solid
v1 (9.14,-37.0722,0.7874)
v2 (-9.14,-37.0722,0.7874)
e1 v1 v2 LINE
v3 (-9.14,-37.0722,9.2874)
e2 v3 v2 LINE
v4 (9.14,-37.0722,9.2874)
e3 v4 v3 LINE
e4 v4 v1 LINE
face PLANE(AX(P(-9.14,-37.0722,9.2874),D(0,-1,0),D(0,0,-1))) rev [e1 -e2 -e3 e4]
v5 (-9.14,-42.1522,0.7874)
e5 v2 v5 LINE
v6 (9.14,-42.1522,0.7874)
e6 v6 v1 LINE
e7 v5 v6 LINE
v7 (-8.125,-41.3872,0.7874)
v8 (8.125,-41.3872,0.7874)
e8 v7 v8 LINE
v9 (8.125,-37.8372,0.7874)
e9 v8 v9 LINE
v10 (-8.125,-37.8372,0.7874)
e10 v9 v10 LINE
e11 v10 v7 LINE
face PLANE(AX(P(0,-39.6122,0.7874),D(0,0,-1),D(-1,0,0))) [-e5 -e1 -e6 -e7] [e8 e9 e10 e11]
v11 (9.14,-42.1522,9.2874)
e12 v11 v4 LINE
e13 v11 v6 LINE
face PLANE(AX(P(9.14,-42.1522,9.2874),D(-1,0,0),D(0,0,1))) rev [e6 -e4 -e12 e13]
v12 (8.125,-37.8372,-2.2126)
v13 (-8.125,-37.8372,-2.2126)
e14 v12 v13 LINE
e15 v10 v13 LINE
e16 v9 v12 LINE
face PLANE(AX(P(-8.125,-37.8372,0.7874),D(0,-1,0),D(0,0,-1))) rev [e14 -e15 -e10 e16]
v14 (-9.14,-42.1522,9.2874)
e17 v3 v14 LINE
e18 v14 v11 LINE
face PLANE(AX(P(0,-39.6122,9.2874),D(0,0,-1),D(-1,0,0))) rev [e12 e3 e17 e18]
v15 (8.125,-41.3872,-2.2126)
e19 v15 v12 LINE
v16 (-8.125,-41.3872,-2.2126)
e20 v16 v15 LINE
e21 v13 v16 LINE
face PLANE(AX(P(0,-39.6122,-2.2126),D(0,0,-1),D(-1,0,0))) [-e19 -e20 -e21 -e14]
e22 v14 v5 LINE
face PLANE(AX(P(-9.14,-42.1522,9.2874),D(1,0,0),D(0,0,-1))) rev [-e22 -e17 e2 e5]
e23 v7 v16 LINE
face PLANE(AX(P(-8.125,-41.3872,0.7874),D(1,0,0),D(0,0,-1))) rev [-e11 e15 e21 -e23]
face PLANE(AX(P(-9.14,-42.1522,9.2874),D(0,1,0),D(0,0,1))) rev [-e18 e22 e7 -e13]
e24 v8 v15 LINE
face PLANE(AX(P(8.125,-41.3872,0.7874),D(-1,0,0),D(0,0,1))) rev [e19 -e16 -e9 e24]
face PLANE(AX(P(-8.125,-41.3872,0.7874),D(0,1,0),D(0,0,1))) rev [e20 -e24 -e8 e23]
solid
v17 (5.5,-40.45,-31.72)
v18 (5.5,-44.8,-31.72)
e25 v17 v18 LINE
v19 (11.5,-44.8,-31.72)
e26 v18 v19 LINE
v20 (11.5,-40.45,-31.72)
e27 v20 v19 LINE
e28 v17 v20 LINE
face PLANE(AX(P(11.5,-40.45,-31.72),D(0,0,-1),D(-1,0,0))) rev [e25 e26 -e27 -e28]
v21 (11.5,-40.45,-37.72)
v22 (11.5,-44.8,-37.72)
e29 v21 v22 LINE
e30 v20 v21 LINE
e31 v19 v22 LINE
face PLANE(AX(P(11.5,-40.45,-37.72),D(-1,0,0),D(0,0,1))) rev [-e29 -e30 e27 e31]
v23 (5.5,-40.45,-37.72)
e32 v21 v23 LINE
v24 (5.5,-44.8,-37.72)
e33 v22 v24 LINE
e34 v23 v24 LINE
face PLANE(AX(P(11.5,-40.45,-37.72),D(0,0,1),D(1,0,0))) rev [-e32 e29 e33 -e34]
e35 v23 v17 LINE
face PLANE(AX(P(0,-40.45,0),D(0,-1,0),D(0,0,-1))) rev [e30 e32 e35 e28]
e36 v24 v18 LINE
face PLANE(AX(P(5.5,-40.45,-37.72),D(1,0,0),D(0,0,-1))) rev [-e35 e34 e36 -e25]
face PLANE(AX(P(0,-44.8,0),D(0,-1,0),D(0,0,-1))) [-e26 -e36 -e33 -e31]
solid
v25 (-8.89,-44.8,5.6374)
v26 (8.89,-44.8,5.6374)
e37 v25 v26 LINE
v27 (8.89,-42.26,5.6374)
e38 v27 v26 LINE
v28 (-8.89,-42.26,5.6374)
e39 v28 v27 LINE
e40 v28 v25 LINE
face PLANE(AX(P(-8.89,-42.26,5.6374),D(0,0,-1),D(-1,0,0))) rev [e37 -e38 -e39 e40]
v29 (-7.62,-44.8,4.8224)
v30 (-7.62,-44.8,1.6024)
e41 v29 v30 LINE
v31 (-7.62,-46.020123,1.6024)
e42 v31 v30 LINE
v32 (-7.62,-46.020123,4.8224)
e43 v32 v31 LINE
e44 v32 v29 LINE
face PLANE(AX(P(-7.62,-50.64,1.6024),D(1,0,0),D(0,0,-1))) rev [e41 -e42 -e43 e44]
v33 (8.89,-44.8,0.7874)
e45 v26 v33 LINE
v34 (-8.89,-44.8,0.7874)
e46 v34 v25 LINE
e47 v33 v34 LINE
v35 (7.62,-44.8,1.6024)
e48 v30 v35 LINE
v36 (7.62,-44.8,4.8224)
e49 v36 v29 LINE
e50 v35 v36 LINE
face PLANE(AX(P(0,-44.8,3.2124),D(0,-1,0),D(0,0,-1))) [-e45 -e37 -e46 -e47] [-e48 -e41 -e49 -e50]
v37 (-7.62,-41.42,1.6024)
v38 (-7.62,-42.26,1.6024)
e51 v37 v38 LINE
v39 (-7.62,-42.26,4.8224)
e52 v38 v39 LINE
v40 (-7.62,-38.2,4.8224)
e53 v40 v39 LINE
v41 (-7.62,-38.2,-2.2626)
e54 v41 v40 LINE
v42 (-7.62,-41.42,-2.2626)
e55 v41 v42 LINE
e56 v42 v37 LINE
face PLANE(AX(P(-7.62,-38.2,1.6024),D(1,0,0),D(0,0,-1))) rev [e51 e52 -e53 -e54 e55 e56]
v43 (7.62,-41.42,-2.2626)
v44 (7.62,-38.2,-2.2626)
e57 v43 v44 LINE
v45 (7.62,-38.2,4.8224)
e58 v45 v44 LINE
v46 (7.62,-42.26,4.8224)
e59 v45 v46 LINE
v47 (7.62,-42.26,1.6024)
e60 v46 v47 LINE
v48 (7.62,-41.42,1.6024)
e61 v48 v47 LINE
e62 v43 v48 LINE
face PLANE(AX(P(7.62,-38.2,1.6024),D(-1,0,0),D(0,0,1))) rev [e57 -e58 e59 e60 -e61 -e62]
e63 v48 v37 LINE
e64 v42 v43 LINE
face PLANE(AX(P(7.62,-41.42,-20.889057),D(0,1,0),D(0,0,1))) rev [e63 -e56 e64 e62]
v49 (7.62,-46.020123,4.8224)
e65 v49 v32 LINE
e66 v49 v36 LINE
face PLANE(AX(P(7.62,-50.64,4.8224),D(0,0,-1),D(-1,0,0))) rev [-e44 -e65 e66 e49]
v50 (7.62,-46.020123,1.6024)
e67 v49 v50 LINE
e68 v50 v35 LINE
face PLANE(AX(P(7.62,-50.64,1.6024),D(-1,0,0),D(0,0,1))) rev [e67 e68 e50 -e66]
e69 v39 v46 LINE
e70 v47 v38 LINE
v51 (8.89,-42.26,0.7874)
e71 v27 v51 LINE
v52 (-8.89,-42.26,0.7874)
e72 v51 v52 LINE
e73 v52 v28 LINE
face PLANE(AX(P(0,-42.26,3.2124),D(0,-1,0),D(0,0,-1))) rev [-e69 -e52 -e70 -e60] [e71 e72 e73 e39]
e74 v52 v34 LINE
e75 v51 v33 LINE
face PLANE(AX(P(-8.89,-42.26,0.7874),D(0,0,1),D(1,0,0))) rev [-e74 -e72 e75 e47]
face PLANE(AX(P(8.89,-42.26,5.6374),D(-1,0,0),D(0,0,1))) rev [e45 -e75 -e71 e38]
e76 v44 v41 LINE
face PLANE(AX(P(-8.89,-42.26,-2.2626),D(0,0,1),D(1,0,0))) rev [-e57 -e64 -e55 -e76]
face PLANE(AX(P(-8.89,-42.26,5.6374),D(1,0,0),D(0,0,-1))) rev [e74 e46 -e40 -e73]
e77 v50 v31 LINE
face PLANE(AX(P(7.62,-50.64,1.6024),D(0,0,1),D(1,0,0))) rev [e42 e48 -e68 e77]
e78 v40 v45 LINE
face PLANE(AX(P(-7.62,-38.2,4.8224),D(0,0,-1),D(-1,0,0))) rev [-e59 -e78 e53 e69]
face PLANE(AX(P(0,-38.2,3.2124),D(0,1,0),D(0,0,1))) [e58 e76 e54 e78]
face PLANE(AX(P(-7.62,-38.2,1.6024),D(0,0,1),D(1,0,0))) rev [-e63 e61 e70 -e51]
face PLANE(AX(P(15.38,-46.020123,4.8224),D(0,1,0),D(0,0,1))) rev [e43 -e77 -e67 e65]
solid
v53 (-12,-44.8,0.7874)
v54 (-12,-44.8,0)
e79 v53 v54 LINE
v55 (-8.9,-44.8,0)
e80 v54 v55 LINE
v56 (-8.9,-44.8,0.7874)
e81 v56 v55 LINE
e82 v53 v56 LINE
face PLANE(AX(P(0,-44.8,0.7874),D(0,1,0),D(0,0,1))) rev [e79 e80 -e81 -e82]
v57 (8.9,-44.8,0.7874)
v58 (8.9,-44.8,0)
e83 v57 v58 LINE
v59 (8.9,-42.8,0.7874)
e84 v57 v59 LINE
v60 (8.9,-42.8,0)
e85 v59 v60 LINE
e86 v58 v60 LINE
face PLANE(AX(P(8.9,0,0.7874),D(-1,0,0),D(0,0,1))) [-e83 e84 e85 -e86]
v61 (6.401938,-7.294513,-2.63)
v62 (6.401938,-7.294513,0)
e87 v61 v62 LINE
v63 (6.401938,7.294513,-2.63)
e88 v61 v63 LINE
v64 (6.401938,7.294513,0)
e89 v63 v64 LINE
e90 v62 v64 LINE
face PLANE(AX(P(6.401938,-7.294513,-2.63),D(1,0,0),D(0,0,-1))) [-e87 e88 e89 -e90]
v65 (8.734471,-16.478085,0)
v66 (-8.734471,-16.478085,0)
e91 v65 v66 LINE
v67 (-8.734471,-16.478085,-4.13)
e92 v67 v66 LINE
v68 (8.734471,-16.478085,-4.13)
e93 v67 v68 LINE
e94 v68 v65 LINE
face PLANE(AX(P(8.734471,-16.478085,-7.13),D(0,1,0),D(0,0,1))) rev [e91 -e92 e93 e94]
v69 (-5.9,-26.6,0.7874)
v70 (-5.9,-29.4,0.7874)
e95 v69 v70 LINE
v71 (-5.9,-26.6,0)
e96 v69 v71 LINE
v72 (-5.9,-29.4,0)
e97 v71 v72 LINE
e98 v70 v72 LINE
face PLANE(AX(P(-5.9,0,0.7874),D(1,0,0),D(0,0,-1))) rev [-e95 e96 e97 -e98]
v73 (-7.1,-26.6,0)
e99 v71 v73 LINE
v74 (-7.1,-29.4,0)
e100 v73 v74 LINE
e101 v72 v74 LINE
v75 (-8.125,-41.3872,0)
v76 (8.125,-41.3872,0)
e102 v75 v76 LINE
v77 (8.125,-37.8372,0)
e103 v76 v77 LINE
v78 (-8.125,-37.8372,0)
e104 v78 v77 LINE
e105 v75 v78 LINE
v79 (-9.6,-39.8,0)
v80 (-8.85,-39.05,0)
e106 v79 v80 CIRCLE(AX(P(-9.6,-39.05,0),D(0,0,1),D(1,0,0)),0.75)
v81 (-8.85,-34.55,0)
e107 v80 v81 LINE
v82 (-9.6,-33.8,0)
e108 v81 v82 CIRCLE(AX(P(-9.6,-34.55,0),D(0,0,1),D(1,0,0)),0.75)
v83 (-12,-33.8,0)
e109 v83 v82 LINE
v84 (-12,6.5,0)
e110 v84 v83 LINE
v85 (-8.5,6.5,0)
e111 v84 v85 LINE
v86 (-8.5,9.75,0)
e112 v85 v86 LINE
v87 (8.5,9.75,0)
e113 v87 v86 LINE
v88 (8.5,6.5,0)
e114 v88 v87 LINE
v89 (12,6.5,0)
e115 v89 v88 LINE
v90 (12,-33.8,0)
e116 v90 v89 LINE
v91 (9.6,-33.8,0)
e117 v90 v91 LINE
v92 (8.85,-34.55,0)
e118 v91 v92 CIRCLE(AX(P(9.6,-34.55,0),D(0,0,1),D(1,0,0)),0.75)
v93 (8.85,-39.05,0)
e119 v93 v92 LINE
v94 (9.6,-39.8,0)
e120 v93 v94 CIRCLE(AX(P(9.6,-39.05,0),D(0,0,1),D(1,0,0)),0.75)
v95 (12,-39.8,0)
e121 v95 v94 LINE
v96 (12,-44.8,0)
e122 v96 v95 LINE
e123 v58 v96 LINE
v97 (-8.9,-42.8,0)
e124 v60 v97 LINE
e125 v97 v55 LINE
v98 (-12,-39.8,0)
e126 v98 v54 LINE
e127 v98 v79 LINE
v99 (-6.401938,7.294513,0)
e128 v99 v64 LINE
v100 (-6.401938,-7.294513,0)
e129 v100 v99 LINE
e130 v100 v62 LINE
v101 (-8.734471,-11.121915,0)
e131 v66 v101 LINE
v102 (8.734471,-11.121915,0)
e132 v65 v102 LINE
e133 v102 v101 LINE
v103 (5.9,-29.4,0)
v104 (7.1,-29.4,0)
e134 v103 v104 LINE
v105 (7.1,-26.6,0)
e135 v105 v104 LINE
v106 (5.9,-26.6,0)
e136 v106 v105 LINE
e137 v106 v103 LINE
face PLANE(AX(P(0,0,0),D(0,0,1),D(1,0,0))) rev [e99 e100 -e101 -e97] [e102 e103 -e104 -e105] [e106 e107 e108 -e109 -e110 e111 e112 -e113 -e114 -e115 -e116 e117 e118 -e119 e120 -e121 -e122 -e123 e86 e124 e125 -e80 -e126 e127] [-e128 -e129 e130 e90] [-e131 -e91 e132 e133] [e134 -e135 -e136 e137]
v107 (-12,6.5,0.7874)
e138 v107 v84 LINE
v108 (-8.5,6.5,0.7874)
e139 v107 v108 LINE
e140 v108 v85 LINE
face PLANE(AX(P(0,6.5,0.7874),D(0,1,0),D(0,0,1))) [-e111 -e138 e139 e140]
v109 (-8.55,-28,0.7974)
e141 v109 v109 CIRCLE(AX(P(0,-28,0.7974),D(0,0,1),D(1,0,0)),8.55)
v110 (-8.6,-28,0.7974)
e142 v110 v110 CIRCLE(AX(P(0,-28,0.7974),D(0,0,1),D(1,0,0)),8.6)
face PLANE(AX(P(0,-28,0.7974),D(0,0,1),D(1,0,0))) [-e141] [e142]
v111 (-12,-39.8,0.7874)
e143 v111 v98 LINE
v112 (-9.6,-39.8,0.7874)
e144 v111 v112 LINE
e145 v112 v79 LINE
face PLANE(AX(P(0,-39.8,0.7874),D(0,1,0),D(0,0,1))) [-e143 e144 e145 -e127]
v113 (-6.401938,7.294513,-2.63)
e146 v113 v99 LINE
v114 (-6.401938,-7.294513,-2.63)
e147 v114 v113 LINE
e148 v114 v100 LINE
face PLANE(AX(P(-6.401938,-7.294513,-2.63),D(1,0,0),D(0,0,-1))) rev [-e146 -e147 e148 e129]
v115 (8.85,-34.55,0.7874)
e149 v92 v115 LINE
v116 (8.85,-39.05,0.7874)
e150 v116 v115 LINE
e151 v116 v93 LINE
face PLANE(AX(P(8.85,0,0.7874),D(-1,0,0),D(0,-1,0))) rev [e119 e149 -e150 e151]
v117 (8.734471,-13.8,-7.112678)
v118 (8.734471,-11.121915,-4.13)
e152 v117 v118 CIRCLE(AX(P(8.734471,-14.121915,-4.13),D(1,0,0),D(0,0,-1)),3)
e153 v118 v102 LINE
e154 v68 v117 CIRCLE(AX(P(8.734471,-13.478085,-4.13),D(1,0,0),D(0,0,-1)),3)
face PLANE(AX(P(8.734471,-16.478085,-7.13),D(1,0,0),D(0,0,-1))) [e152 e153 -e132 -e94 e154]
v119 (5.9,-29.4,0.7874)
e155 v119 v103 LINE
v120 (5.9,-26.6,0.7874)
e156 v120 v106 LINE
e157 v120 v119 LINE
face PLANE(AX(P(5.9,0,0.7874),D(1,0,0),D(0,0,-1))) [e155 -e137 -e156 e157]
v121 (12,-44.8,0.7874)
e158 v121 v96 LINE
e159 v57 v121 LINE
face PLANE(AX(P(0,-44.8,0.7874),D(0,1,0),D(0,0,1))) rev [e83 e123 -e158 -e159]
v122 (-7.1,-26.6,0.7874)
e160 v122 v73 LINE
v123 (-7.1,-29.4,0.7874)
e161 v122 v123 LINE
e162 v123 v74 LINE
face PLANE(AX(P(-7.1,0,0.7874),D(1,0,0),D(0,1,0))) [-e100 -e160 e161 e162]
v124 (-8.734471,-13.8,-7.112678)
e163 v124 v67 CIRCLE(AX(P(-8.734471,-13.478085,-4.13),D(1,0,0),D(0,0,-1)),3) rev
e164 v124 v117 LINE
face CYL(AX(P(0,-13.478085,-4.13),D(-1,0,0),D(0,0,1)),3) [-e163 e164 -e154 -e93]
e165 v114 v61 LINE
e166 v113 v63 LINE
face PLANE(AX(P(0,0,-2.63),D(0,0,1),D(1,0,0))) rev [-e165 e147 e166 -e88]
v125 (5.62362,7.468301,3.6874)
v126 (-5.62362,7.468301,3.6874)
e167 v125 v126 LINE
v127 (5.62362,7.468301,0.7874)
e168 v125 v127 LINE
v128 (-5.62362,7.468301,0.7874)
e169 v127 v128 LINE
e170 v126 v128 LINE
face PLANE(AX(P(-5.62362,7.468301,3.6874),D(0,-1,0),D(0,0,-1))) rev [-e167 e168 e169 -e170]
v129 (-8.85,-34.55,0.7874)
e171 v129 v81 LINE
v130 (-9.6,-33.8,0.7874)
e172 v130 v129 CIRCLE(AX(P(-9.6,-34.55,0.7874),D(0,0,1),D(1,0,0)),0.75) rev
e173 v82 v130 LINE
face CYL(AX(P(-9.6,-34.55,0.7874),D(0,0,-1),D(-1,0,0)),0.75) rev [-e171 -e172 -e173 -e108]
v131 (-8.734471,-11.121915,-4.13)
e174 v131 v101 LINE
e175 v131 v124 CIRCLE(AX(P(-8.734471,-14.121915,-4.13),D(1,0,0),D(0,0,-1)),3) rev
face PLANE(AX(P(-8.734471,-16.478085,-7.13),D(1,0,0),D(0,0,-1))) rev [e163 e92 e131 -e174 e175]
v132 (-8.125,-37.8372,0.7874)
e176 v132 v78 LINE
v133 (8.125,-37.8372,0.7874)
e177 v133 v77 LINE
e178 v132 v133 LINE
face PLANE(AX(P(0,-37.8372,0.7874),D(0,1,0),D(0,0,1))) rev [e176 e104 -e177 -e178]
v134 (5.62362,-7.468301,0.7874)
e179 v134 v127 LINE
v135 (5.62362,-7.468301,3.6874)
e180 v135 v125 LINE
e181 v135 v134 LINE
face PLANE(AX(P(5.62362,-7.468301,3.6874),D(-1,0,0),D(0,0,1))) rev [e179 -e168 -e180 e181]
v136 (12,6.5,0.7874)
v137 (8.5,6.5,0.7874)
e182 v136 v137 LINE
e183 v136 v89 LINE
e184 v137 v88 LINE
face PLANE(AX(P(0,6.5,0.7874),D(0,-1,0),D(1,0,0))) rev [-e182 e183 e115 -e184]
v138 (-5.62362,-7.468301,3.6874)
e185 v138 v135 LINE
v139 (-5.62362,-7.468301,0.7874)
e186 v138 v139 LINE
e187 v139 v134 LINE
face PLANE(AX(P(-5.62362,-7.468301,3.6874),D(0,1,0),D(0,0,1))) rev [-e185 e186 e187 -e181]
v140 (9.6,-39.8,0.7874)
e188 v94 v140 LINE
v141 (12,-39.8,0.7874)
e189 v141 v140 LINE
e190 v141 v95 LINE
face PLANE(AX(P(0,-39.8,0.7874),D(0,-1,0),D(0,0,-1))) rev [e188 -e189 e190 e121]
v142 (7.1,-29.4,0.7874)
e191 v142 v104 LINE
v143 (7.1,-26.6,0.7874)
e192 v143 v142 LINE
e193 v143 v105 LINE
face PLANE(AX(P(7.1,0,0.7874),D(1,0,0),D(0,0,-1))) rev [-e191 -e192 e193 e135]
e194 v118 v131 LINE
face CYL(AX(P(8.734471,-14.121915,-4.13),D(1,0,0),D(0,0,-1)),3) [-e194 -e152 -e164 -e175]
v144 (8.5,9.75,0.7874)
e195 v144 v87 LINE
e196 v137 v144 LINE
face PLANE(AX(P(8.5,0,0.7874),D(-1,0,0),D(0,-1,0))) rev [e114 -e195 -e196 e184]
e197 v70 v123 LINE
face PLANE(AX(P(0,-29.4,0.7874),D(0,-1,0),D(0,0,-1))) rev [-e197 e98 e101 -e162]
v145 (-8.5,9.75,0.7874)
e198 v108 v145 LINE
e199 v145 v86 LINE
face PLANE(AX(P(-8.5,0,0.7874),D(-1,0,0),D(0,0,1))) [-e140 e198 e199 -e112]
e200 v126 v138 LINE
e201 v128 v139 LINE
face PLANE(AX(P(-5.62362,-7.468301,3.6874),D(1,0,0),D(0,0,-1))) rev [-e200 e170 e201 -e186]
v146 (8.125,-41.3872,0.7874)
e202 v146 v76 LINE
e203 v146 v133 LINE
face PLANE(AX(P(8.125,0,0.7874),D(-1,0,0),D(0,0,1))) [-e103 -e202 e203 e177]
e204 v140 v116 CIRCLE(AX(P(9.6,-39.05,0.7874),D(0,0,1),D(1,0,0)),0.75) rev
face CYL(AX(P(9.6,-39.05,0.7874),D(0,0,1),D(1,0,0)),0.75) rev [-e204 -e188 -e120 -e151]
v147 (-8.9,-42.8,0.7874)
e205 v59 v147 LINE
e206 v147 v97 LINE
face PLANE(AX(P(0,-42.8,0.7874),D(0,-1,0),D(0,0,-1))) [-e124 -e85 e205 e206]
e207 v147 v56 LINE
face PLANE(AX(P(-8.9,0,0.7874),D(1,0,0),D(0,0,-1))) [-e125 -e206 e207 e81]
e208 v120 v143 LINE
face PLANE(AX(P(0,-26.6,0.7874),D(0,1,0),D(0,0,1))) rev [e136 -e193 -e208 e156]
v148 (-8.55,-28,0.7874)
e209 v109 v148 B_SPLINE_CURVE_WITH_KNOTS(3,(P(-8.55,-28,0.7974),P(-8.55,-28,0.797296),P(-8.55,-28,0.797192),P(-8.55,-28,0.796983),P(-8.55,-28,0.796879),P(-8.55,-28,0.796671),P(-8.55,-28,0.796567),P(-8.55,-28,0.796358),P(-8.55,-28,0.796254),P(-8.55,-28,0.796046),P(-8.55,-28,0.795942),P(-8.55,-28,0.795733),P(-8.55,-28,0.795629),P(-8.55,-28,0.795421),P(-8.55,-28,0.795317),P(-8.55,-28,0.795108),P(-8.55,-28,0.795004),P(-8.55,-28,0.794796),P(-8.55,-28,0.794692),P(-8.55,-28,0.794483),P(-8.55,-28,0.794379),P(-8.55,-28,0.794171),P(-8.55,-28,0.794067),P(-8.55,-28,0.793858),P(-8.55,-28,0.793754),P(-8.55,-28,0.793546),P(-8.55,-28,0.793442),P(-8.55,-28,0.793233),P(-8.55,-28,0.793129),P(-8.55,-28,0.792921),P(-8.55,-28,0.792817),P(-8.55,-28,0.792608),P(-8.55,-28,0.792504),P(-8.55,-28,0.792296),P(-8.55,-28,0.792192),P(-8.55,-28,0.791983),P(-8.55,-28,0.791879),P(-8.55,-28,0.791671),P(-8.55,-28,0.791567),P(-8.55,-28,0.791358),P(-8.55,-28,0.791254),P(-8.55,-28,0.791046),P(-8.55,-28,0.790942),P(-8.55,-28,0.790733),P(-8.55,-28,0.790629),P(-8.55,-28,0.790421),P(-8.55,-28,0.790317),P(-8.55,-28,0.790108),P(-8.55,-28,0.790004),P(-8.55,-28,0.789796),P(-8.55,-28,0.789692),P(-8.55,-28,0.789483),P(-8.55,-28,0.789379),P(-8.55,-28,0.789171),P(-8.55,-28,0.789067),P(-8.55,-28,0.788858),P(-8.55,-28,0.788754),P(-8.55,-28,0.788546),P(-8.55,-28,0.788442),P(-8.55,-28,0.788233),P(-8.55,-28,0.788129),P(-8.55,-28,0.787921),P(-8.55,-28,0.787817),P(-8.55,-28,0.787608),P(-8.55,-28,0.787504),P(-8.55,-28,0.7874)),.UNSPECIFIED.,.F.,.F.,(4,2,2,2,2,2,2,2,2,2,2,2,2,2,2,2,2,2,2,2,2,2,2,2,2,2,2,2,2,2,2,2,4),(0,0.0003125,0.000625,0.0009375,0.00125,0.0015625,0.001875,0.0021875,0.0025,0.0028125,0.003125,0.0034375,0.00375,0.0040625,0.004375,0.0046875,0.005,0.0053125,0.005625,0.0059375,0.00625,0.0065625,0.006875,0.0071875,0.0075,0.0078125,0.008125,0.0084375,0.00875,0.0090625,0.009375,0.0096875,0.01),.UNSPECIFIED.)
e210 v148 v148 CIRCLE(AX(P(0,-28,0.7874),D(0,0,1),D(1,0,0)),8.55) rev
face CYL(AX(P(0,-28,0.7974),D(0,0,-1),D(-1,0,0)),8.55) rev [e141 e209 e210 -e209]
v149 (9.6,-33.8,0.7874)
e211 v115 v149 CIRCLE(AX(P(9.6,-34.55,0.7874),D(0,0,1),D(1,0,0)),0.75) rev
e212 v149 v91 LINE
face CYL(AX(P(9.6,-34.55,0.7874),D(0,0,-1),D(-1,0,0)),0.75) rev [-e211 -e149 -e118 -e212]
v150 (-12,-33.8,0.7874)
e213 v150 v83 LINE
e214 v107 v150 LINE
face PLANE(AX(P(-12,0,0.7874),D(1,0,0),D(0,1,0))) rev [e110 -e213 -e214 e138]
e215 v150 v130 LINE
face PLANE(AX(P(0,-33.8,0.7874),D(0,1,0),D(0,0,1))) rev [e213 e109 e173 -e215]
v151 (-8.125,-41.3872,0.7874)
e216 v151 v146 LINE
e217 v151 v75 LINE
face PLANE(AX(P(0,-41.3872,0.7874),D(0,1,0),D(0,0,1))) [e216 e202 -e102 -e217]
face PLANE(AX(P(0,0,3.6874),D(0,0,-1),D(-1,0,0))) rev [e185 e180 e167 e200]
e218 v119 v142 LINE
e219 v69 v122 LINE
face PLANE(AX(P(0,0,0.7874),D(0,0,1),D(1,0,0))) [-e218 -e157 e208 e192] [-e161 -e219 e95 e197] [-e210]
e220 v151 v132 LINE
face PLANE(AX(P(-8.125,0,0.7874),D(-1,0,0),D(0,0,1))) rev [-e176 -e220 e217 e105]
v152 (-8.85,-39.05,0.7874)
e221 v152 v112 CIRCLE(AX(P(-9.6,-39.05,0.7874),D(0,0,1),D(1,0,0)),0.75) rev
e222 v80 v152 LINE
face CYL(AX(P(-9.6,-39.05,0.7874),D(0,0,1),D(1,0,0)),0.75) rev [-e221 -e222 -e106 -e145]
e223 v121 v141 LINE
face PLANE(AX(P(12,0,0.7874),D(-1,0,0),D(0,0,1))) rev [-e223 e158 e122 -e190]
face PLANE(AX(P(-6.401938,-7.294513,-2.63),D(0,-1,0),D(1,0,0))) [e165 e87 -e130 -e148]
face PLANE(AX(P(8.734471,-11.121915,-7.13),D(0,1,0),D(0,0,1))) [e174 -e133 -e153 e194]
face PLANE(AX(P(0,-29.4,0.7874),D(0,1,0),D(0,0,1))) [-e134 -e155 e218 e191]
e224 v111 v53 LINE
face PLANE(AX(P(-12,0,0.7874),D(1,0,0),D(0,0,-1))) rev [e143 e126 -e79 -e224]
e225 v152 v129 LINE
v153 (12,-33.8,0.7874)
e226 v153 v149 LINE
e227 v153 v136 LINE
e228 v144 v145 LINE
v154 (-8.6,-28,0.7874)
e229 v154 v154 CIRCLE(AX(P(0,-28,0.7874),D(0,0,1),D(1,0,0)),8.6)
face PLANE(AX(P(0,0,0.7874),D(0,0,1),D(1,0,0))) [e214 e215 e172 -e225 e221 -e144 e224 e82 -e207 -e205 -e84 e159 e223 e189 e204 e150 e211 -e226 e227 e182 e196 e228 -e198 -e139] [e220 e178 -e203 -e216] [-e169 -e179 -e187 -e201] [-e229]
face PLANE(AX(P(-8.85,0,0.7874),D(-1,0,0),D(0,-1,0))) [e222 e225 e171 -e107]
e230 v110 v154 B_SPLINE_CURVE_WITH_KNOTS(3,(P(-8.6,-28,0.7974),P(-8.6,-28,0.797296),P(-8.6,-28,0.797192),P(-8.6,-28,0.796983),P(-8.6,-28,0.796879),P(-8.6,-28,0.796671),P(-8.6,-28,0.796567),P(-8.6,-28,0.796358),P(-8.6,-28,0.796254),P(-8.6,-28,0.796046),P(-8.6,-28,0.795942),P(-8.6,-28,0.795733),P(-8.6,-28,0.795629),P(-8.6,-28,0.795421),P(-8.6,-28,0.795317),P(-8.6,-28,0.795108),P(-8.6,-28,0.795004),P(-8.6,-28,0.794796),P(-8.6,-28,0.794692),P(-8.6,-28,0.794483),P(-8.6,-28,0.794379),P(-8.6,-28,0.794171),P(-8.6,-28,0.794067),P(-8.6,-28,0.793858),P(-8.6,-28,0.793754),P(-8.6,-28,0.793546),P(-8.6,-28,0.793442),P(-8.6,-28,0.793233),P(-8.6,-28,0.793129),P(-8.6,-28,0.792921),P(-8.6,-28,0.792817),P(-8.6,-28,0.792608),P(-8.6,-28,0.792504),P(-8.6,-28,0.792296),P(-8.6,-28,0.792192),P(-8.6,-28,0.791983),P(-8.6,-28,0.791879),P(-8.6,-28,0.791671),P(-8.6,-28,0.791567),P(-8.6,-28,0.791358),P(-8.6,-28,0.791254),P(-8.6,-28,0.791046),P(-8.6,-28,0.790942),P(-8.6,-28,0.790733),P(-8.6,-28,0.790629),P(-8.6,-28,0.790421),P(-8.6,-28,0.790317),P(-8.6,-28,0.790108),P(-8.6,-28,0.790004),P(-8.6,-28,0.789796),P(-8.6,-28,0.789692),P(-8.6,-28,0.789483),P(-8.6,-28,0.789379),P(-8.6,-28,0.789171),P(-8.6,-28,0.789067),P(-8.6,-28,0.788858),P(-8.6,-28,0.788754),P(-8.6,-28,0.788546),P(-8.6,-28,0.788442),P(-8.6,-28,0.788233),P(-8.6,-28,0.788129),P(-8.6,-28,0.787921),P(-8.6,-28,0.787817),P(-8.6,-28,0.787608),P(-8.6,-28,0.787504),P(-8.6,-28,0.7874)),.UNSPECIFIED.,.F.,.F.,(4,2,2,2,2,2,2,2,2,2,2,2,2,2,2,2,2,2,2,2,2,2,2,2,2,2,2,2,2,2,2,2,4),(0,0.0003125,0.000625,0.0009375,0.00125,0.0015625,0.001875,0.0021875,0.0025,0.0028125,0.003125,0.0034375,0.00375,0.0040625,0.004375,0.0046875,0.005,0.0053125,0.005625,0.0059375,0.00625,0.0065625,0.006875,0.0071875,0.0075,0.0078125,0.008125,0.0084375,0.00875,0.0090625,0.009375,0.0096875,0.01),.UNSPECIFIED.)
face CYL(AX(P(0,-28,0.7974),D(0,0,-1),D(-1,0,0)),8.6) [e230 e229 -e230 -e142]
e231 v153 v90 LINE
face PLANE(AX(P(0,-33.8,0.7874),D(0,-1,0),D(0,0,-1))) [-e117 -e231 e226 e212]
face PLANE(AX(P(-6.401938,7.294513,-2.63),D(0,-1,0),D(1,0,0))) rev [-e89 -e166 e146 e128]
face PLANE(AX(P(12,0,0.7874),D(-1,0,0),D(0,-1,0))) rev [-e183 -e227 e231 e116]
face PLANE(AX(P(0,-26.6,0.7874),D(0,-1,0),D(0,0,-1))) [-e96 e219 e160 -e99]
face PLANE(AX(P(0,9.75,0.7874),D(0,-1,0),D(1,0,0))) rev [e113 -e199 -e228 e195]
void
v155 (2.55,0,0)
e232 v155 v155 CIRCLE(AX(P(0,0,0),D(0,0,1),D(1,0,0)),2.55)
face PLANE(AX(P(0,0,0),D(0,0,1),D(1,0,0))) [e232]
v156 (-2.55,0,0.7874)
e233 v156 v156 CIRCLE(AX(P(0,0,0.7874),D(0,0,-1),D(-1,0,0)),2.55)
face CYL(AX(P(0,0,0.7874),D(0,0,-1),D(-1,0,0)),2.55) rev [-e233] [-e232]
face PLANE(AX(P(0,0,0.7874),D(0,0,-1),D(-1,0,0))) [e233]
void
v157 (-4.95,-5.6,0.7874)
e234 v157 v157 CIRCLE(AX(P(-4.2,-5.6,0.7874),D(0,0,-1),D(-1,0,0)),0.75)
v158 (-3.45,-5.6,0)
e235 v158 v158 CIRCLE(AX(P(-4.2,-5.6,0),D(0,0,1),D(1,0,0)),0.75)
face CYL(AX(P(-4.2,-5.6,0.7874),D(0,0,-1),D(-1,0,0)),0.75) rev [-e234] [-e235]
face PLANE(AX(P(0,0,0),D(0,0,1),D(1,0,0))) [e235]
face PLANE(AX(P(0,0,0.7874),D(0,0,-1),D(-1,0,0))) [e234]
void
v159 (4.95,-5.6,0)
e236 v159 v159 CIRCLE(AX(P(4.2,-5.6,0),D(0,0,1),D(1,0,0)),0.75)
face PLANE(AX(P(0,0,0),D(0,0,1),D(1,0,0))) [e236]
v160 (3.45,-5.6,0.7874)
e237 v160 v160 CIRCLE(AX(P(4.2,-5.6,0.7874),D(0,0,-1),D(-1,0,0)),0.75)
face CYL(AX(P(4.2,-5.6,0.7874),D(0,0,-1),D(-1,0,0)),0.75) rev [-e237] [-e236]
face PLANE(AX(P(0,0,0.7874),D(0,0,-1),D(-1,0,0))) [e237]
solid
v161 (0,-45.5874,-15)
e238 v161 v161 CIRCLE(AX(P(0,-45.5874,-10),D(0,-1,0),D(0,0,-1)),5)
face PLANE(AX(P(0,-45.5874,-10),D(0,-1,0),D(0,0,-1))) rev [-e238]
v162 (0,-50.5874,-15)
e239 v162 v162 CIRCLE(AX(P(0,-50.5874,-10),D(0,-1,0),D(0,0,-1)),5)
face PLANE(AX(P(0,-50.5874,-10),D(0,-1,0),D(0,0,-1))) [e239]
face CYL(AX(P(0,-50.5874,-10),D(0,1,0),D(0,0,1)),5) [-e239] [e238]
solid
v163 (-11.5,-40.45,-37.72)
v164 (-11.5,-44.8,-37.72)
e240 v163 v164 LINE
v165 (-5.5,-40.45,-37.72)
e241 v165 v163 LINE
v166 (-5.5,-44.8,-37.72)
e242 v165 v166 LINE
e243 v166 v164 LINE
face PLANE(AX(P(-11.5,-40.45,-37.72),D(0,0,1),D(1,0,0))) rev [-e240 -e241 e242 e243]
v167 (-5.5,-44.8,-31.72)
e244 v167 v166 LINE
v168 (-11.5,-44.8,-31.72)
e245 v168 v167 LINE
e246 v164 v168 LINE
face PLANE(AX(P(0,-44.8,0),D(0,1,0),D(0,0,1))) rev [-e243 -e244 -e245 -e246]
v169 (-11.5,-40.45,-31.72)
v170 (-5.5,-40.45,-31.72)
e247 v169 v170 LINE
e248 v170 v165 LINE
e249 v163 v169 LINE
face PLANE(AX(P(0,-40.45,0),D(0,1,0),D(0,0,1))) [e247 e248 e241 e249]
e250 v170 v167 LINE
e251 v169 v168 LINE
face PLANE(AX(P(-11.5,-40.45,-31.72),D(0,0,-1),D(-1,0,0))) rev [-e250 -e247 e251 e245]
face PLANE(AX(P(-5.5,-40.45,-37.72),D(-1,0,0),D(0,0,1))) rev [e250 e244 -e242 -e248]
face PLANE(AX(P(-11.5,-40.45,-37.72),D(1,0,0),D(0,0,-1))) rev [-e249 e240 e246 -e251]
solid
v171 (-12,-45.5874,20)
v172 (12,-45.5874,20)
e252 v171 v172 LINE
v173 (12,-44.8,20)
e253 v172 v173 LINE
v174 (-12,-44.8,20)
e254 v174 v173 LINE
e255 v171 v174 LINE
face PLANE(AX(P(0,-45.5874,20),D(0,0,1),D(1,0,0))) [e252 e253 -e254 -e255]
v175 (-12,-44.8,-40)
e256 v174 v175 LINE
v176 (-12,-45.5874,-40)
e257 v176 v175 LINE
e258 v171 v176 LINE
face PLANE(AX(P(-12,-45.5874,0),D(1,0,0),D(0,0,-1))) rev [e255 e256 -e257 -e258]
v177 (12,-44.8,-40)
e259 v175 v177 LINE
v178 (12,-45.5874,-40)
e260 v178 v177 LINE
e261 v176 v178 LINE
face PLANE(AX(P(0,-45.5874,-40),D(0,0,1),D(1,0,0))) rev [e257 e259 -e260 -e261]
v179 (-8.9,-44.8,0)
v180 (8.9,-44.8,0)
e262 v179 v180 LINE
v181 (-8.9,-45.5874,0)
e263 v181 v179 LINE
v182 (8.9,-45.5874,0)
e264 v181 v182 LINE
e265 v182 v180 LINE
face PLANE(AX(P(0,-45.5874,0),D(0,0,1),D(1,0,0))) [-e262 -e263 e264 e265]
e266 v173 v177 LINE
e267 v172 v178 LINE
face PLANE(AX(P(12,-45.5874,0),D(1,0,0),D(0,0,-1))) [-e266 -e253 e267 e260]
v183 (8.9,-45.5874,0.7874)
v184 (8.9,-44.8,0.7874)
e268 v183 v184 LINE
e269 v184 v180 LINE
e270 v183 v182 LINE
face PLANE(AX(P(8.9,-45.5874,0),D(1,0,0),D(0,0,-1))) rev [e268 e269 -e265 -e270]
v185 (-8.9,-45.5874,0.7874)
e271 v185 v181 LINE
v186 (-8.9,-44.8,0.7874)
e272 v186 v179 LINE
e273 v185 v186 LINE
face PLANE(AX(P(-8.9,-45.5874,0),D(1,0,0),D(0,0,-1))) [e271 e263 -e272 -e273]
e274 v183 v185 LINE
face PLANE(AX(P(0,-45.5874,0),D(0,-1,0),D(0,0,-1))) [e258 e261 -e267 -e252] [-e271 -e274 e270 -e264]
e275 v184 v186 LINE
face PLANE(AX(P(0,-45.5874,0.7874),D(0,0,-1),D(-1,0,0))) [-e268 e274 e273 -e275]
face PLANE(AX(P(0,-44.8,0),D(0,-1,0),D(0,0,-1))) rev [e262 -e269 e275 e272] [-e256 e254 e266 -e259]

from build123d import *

# Parameters (mm, degrees)
SKETCH1_R                         = 2.55
SKETCH1_R_2                       = 0.75
SKETCH1_W                         = 1.2
SKETCH1_H                         = 2.8
SKETCH1_W_2                       = 16.25
SKETCH1_H_2                       = 3.55
BOSS_EXTRUDE3_DEPTH               = 0.7874
SKETCH6_R                         = 8.6
SKETCH6_R_2                       = 8.55
EXTRUDE_THIN1_DEPTH               = 0.01
SKETCH2_W                         = 24
SKETCH2_H                         = 60
SKETCH2_W_2                       = 17.8
SKETCH2_H_2                       = 0.7874
BOSS_EXTRUDE6_DEPTH               = 0.7874
SKETCH3_R                         = 5
BOSS_EXTRUDE7_DEPTH               = 5
SKETCH4_W                         = 6
SKETCH4_H                         = 6
BOSS_EXTRUDE8_DEPTH               = 4.35
BOSS_EXTRUDE8_2_DEPTH             = 4.35
SKETCH5_W                         = 17.468941522
SKETCH5_H                         = 5.356170352
BOSS_EXTRUDE9_DEPTH               = 7.13
FILLET1_R                         = 3
FEMALE_START                      = -8.125
FEMALE_CONNECTOR_DEPTH            = 16.25
FEMALE_START_2                    = -9.14
FEMALE_CONNECTOR_2_OUTLINE_W      = 5.08
FEMALE_CONNECTOR_2_OUTLINE_H      = 8.5
FEMALE_CONNECTOR_2_DEPTH          = 18.28
SKETCH10_W                        = 12.803875086
SKETCH10_H                        = 14.58902636
BOSS_EXTRUDE11_DEPTH              = 2.63
PCB_START                         = -41.141819053
PCB_CONNECTOR_QUARK_OUTLINE_W     = 15.24
PCB_CONNECTOR_QUARK_OUTLINE_H     = 3.22
PCB_CONNECTOR_QUARK_DEPTH         = 12.44
PCB_START_2                       = -31.921819053
PCB_CONNECTOR_QUARK_2_OUTLINE_W   = 15.24
PCB_CONNECTOR_QUARK_2_OUTLINE_H   = 3.865
PCB_CONNECTOR_QUARK_2_DEPTH       = 3.22
PCB_START_3                       = -35.301819053
PCB_CONNECTOR_QUARK_3_OUTLINE_W   = 17.78
PCB_CONNECTOR_QUARK_3_OUTLINE_H   = 4.85
PCB_CONNECTOR_QUARK_3_OUTLINE_W_2 = 15.24
PCB_CONNECTOR_QUARK_3_OUTLINE_H_2 = 3.22
PCB_CONNECTOR_QUARK_3_DEPTH       = 2.54
FILLET2_R                         = 0.75
SKETCH16_W                        = 11.24724057
SKETCH16_H                        = 14.93660129
BOSS_EXTRUDE12_DEPTH              = 2.9
SKETCH17_W                        = 3.22
SKETCH17_H                        = 4.619876858
CUT_EXTRUDE1_DEPTH                = 23


with BuildPart() as part:
    # Sketch1 → Boss-Extrude3 (new body)
    with BuildSketch(Plane.XY):
        Polygon((8.5, 9.75), (-8.5, 9.75), (-8.5, 6.5), (-12, 6.5), (-12, -33.8), (-8.85, -33.8), (-8.85, -39.8), (-12, -39.8), (-12, -44.8), (-8.9, -44.8), (-8.9, -42.8), (8.9, -42.8), (8.9, -44.8), (12, -44.8), (12, -39.8), (8.85, -39.8), (8.85, -33.8), (12, -33.8), (12, 6.5), (8.5, 6.5), align=None)
        Circle(SKETCH1_R, mode=Mode.SUBTRACT)
        with Locations((-4.2, -5.6)):
            Circle(SKETCH1_R_2, mode=Mode.SUBTRACT)
        with Locations((4.2, -5.6)):
            Circle(SKETCH1_R_2, mode=Mode.SUBTRACT)
        with Locations((6.5, -28)):
            Rectangle(SKETCH1_W, SKETCH1_H, mode=Mode.SUBTRACT)
        with Locations((-6.5, -28)):
            Rectangle(SKETCH1_W, SKETCH1_H, mode=Mode.SUBTRACT)
        with Locations((0, -39.6122)):
            Rectangle(SKETCH1_W_2, SKETCH1_H_2, mode=Mode.SUBTRACT)
    extrude(amount=BOSS_EXTRUDE3_DEPTH)

    # Sketch6 → Extrude-Thin1 (add)
    with BuildSketch(Plane.XY.offset(0.7874)):
        with Locations((0, -28)):
            Circle(SKETCH6_R)
        with Locations((0, -28)):
            Circle(SKETCH6_R_2, mode=Mode.SUBTRACT)
    extrude(amount=EXTRUDE_THIN1_DEPTH)

    # Sketch5 → Boss-Extrude9 (add)
    with BuildSketch(Plane(origin=(0, 0, 0), x_dir=(-1, 0, 0), z_dir=(0, 0, -1))):
        with Locations((0, -13.8)):
            Rectangle(SKETCH5_W, SKETCH5_H)
    extrude(amount=BOSS_EXTRUDE9_DEPTH)

    # Fillet1
    # the kernel refuses this fillet: 3 mm, written as the material it takes off along each edge
    with BuildSketch(Plane(origin=(16.234470761, -16.478085176, -7.13), x_dir=(0, 0, 1), z_dir=(-1, 0, 0)), Plane(origin=(-16.234470761, -11.121914824, -7.13), x_dir=(0, 0, 1), z_dir=(1, 0, 0))) as fillet1_piece_1:
        with BuildLine():
            CenterArc((FILLET1_R, FILLET1_R), FILLET1_R, 180, 90)
            Line((0, FILLET1_R), (0, 0))
            Line((0, 0), (FILLET1_R, 0))
        make_face()
    extrude(amount=32.468941522, mode=Mode.SUBTRACT)

    # Sketch10 → Boss-Extrude11 (add)
    with BuildSketch(Plane(origin=(0, 0, 0), x_dir=(-1, 0, 0), z_dir=(0, 0, -1))):
        Rectangle(SKETCH10_W, SKETCH10_H)
    extrude(amount=BOSS_EXTRUDE11_DEPTH)

    # Fillet2
    fillet2_edges = [part.edges().sort_by_distance(p)[0] for p in [
        (-8.85, -39.8, 0.3937),
        (-8.85, -33.8, 0.3937),
        (8.85, -33.8, 0.3937),
        (8.85, -39.8, 0.3937),
    ]]
    fillet(fillet2_edges, radius=FILLET2_R)

    # Sketch16 → Boss-Extrude12 (add)
    with BuildSketch(Plane.XY.offset(0.7874)):
        Rectangle(SKETCH16_W, SKETCH16_H)
    extrude(amount=BOSS_EXTRUDE12_DEPTH)


with BuildPart() as body_2:
    # Sketch2 → Boss-Extrude6 (new body)
    with BuildSketch(Plane.XZ.offset(44.8)):
        with Locations((0, -10)):
            Rectangle(SKETCH2_W, SKETCH2_H)
        with Locations((0, 0.3937)):
            Rectangle(SKETCH2_W_2, SKETCH2_H_2, mode=Mode.SUBTRACT)
    extrude(amount=BOSS_EXTRUDE6_DEPTH)


with BuildPart() as body_3:
    # Sketch3 → Boss-Extrude7 (new body)
    with BuildSketch(Plane.XZ.offset(45.5874)):
        with Locations(Location((0, -10, 0), (0, 0, 270))):
            Circle(SKETCH3_R)
    extrude(amount=BOSS_EXTRUDE7_DEPTH)


with BuildPart() as body_4:
    # Sketch4 → Boss-Extrude8 (new body)
    with BuildSketch(Plane(origin=(0, -44.8, 0), x_dir=(1, 0, 0), z_dir=(0, 1, 0))):
        with Locations((-8.5, 34.72)):
            Rectangle(SKETCH4_W, SKETCH4_H)
    extrude(amount=BOSS_EXTRUDE8_DEPTH)


with BuildPart() as body_5:
    # Sketch4 → Boss-Extrude8 2 (new body)
    with BuildSketch(Plane(origin=(0, -44.8, 0), x_dir=(1, 0, 0), z_dir=(0, 1, 0))):
        with Locations((8.5, 34.72)):
            Rectangle(SKETCH4_W, SKETCH4_H)
    extrude(amount=BOSS_EXTRUDE8_2_DEPTH)


with BuildPart() as body_6:
    # Female Connector: read off the stored shape, not the designer's step
    # Female Connector outline → Female Connector (new body)
    with BuildSketch(Plane.YZ.offset(FEMALE_START)):
        Polygon((-37.8372, -2.2126), (-37.8372, 0.7874), (-37.0722, 0.7874), (-37.0722, 9.2874), (-42.1522, 9.2874), (-42.1522, 0.7874), (-41.3872, 0.7874), (-41.3872, -2.2126), align=None)
    extrude(amount=FEMALE_CONNECTOR_DEPTH)

    # Female Connector 2 outline → Female Connector 2 (add)
    with BuildSketch(Plane.YZ.offset(FEMALE_START_2)):
        with Locations((-39.6122, 5.0374)):
            Rectangle(FEMALE_CONNECTOR_2_OUTLINE_W, FEMALE_CONNECTOR_2_OUTLINE_H)
    extrude(amount=FEMALE_CONNECTOR_2_DEPTH)


with BuildPart() as body_7:
    # PCB CONNECTOR_Quark: read off the stored shape, not the designer's step
    # PCB CONNECTOR_Quark outline → PCB CONNECTOR_Quark (new body)
    with BuildSketch(Plane(origin=(0, 0, 0), x_dir=(1, 0, 0), z_dir=(0, 1, 0)).offset(PCB_START)):
        with Locations((12.610768587, -17.421401355)):
            Rectangle(PCB_CONNECTOR_QUARK_OUTLINE_W, PCB_CONNECTOR_QUARK_OUTLINE_H)
    extrude(amount=PCB_CONNECTOR_QUARK_DEPTH)

    # PCB CONNECTOR_Quark 2 outline → PCB CONNECTOR_Quark 2 (add)
    with BuildSketch(Plane(origin=(0, 0, 0), x_dir=(1, 0, 0), z_dir=(0, 1, 0)).offset(PCB_START_2)):
        with Locations((12.610768587, -13.878901355)):
            Rectangle(PCB_CONNECTOR_QUARK_2_OUTLINE_W, PCB_CONNECTOR_QUARK_2_OUTLINE_H)
    extrude(amount=PCB_CONNECTOR_QUARK_2_DEPTH)

    # PCB CONNECTOR_Quark 3 outline → PCB CONNECTOR_Quark 3 (add)
    with BuildSketch(Plane(origin=(0, 0, 0), x_dir=(1, 0, 0), z_dir=(0, 1, 0)).offset(PCB_START_3)):
        with Locations((12.610768587, -17.421401355)):
            Rectangle(PCB_CONNECTOR_QUARK_3_OUTLINE_W, PCB_CONNECTOR_QUARK_3_OUTLINE_H)
        with Locations((12.610768587, -17.421401355)):
            Rectangle(PCB_CONNECTOR_QUARK_3_OUTLINE_W_2, PCB_CONNECTOR_QUARK_3_OUTLINE_H_2, mode=Mode.SUBTRACT)
    extrude(amount=PCB_CONNECTOR_QUARK_3_DEPTH)


with BuildPart() as body_7_1:
    # Body-Move/Copy6: read off the stored shape, not the designer's step
    # Body-Move/Copy6: moved
    add(body_7.part.moved(Location((-12.6107686, -9.4981809, -14.2090014))))

    # Sketch17 → Cut-Extrude1 (cut)
    with BuildSketch(Plane.ZY.offset(7.62)):
        with Locations((3.2124, -48.330061571)):
            Rectangle(SKETCH17_W, SKETCH17_H)
    extrude(amount=-CUT_EXTRUDE1_DEPTH, mode=Mode.SUBTRACT)


solid = Compound([part.part, body_2.part, body_3.part, body_4.part, body_5.part, body_6.part, body_7_1.part])
